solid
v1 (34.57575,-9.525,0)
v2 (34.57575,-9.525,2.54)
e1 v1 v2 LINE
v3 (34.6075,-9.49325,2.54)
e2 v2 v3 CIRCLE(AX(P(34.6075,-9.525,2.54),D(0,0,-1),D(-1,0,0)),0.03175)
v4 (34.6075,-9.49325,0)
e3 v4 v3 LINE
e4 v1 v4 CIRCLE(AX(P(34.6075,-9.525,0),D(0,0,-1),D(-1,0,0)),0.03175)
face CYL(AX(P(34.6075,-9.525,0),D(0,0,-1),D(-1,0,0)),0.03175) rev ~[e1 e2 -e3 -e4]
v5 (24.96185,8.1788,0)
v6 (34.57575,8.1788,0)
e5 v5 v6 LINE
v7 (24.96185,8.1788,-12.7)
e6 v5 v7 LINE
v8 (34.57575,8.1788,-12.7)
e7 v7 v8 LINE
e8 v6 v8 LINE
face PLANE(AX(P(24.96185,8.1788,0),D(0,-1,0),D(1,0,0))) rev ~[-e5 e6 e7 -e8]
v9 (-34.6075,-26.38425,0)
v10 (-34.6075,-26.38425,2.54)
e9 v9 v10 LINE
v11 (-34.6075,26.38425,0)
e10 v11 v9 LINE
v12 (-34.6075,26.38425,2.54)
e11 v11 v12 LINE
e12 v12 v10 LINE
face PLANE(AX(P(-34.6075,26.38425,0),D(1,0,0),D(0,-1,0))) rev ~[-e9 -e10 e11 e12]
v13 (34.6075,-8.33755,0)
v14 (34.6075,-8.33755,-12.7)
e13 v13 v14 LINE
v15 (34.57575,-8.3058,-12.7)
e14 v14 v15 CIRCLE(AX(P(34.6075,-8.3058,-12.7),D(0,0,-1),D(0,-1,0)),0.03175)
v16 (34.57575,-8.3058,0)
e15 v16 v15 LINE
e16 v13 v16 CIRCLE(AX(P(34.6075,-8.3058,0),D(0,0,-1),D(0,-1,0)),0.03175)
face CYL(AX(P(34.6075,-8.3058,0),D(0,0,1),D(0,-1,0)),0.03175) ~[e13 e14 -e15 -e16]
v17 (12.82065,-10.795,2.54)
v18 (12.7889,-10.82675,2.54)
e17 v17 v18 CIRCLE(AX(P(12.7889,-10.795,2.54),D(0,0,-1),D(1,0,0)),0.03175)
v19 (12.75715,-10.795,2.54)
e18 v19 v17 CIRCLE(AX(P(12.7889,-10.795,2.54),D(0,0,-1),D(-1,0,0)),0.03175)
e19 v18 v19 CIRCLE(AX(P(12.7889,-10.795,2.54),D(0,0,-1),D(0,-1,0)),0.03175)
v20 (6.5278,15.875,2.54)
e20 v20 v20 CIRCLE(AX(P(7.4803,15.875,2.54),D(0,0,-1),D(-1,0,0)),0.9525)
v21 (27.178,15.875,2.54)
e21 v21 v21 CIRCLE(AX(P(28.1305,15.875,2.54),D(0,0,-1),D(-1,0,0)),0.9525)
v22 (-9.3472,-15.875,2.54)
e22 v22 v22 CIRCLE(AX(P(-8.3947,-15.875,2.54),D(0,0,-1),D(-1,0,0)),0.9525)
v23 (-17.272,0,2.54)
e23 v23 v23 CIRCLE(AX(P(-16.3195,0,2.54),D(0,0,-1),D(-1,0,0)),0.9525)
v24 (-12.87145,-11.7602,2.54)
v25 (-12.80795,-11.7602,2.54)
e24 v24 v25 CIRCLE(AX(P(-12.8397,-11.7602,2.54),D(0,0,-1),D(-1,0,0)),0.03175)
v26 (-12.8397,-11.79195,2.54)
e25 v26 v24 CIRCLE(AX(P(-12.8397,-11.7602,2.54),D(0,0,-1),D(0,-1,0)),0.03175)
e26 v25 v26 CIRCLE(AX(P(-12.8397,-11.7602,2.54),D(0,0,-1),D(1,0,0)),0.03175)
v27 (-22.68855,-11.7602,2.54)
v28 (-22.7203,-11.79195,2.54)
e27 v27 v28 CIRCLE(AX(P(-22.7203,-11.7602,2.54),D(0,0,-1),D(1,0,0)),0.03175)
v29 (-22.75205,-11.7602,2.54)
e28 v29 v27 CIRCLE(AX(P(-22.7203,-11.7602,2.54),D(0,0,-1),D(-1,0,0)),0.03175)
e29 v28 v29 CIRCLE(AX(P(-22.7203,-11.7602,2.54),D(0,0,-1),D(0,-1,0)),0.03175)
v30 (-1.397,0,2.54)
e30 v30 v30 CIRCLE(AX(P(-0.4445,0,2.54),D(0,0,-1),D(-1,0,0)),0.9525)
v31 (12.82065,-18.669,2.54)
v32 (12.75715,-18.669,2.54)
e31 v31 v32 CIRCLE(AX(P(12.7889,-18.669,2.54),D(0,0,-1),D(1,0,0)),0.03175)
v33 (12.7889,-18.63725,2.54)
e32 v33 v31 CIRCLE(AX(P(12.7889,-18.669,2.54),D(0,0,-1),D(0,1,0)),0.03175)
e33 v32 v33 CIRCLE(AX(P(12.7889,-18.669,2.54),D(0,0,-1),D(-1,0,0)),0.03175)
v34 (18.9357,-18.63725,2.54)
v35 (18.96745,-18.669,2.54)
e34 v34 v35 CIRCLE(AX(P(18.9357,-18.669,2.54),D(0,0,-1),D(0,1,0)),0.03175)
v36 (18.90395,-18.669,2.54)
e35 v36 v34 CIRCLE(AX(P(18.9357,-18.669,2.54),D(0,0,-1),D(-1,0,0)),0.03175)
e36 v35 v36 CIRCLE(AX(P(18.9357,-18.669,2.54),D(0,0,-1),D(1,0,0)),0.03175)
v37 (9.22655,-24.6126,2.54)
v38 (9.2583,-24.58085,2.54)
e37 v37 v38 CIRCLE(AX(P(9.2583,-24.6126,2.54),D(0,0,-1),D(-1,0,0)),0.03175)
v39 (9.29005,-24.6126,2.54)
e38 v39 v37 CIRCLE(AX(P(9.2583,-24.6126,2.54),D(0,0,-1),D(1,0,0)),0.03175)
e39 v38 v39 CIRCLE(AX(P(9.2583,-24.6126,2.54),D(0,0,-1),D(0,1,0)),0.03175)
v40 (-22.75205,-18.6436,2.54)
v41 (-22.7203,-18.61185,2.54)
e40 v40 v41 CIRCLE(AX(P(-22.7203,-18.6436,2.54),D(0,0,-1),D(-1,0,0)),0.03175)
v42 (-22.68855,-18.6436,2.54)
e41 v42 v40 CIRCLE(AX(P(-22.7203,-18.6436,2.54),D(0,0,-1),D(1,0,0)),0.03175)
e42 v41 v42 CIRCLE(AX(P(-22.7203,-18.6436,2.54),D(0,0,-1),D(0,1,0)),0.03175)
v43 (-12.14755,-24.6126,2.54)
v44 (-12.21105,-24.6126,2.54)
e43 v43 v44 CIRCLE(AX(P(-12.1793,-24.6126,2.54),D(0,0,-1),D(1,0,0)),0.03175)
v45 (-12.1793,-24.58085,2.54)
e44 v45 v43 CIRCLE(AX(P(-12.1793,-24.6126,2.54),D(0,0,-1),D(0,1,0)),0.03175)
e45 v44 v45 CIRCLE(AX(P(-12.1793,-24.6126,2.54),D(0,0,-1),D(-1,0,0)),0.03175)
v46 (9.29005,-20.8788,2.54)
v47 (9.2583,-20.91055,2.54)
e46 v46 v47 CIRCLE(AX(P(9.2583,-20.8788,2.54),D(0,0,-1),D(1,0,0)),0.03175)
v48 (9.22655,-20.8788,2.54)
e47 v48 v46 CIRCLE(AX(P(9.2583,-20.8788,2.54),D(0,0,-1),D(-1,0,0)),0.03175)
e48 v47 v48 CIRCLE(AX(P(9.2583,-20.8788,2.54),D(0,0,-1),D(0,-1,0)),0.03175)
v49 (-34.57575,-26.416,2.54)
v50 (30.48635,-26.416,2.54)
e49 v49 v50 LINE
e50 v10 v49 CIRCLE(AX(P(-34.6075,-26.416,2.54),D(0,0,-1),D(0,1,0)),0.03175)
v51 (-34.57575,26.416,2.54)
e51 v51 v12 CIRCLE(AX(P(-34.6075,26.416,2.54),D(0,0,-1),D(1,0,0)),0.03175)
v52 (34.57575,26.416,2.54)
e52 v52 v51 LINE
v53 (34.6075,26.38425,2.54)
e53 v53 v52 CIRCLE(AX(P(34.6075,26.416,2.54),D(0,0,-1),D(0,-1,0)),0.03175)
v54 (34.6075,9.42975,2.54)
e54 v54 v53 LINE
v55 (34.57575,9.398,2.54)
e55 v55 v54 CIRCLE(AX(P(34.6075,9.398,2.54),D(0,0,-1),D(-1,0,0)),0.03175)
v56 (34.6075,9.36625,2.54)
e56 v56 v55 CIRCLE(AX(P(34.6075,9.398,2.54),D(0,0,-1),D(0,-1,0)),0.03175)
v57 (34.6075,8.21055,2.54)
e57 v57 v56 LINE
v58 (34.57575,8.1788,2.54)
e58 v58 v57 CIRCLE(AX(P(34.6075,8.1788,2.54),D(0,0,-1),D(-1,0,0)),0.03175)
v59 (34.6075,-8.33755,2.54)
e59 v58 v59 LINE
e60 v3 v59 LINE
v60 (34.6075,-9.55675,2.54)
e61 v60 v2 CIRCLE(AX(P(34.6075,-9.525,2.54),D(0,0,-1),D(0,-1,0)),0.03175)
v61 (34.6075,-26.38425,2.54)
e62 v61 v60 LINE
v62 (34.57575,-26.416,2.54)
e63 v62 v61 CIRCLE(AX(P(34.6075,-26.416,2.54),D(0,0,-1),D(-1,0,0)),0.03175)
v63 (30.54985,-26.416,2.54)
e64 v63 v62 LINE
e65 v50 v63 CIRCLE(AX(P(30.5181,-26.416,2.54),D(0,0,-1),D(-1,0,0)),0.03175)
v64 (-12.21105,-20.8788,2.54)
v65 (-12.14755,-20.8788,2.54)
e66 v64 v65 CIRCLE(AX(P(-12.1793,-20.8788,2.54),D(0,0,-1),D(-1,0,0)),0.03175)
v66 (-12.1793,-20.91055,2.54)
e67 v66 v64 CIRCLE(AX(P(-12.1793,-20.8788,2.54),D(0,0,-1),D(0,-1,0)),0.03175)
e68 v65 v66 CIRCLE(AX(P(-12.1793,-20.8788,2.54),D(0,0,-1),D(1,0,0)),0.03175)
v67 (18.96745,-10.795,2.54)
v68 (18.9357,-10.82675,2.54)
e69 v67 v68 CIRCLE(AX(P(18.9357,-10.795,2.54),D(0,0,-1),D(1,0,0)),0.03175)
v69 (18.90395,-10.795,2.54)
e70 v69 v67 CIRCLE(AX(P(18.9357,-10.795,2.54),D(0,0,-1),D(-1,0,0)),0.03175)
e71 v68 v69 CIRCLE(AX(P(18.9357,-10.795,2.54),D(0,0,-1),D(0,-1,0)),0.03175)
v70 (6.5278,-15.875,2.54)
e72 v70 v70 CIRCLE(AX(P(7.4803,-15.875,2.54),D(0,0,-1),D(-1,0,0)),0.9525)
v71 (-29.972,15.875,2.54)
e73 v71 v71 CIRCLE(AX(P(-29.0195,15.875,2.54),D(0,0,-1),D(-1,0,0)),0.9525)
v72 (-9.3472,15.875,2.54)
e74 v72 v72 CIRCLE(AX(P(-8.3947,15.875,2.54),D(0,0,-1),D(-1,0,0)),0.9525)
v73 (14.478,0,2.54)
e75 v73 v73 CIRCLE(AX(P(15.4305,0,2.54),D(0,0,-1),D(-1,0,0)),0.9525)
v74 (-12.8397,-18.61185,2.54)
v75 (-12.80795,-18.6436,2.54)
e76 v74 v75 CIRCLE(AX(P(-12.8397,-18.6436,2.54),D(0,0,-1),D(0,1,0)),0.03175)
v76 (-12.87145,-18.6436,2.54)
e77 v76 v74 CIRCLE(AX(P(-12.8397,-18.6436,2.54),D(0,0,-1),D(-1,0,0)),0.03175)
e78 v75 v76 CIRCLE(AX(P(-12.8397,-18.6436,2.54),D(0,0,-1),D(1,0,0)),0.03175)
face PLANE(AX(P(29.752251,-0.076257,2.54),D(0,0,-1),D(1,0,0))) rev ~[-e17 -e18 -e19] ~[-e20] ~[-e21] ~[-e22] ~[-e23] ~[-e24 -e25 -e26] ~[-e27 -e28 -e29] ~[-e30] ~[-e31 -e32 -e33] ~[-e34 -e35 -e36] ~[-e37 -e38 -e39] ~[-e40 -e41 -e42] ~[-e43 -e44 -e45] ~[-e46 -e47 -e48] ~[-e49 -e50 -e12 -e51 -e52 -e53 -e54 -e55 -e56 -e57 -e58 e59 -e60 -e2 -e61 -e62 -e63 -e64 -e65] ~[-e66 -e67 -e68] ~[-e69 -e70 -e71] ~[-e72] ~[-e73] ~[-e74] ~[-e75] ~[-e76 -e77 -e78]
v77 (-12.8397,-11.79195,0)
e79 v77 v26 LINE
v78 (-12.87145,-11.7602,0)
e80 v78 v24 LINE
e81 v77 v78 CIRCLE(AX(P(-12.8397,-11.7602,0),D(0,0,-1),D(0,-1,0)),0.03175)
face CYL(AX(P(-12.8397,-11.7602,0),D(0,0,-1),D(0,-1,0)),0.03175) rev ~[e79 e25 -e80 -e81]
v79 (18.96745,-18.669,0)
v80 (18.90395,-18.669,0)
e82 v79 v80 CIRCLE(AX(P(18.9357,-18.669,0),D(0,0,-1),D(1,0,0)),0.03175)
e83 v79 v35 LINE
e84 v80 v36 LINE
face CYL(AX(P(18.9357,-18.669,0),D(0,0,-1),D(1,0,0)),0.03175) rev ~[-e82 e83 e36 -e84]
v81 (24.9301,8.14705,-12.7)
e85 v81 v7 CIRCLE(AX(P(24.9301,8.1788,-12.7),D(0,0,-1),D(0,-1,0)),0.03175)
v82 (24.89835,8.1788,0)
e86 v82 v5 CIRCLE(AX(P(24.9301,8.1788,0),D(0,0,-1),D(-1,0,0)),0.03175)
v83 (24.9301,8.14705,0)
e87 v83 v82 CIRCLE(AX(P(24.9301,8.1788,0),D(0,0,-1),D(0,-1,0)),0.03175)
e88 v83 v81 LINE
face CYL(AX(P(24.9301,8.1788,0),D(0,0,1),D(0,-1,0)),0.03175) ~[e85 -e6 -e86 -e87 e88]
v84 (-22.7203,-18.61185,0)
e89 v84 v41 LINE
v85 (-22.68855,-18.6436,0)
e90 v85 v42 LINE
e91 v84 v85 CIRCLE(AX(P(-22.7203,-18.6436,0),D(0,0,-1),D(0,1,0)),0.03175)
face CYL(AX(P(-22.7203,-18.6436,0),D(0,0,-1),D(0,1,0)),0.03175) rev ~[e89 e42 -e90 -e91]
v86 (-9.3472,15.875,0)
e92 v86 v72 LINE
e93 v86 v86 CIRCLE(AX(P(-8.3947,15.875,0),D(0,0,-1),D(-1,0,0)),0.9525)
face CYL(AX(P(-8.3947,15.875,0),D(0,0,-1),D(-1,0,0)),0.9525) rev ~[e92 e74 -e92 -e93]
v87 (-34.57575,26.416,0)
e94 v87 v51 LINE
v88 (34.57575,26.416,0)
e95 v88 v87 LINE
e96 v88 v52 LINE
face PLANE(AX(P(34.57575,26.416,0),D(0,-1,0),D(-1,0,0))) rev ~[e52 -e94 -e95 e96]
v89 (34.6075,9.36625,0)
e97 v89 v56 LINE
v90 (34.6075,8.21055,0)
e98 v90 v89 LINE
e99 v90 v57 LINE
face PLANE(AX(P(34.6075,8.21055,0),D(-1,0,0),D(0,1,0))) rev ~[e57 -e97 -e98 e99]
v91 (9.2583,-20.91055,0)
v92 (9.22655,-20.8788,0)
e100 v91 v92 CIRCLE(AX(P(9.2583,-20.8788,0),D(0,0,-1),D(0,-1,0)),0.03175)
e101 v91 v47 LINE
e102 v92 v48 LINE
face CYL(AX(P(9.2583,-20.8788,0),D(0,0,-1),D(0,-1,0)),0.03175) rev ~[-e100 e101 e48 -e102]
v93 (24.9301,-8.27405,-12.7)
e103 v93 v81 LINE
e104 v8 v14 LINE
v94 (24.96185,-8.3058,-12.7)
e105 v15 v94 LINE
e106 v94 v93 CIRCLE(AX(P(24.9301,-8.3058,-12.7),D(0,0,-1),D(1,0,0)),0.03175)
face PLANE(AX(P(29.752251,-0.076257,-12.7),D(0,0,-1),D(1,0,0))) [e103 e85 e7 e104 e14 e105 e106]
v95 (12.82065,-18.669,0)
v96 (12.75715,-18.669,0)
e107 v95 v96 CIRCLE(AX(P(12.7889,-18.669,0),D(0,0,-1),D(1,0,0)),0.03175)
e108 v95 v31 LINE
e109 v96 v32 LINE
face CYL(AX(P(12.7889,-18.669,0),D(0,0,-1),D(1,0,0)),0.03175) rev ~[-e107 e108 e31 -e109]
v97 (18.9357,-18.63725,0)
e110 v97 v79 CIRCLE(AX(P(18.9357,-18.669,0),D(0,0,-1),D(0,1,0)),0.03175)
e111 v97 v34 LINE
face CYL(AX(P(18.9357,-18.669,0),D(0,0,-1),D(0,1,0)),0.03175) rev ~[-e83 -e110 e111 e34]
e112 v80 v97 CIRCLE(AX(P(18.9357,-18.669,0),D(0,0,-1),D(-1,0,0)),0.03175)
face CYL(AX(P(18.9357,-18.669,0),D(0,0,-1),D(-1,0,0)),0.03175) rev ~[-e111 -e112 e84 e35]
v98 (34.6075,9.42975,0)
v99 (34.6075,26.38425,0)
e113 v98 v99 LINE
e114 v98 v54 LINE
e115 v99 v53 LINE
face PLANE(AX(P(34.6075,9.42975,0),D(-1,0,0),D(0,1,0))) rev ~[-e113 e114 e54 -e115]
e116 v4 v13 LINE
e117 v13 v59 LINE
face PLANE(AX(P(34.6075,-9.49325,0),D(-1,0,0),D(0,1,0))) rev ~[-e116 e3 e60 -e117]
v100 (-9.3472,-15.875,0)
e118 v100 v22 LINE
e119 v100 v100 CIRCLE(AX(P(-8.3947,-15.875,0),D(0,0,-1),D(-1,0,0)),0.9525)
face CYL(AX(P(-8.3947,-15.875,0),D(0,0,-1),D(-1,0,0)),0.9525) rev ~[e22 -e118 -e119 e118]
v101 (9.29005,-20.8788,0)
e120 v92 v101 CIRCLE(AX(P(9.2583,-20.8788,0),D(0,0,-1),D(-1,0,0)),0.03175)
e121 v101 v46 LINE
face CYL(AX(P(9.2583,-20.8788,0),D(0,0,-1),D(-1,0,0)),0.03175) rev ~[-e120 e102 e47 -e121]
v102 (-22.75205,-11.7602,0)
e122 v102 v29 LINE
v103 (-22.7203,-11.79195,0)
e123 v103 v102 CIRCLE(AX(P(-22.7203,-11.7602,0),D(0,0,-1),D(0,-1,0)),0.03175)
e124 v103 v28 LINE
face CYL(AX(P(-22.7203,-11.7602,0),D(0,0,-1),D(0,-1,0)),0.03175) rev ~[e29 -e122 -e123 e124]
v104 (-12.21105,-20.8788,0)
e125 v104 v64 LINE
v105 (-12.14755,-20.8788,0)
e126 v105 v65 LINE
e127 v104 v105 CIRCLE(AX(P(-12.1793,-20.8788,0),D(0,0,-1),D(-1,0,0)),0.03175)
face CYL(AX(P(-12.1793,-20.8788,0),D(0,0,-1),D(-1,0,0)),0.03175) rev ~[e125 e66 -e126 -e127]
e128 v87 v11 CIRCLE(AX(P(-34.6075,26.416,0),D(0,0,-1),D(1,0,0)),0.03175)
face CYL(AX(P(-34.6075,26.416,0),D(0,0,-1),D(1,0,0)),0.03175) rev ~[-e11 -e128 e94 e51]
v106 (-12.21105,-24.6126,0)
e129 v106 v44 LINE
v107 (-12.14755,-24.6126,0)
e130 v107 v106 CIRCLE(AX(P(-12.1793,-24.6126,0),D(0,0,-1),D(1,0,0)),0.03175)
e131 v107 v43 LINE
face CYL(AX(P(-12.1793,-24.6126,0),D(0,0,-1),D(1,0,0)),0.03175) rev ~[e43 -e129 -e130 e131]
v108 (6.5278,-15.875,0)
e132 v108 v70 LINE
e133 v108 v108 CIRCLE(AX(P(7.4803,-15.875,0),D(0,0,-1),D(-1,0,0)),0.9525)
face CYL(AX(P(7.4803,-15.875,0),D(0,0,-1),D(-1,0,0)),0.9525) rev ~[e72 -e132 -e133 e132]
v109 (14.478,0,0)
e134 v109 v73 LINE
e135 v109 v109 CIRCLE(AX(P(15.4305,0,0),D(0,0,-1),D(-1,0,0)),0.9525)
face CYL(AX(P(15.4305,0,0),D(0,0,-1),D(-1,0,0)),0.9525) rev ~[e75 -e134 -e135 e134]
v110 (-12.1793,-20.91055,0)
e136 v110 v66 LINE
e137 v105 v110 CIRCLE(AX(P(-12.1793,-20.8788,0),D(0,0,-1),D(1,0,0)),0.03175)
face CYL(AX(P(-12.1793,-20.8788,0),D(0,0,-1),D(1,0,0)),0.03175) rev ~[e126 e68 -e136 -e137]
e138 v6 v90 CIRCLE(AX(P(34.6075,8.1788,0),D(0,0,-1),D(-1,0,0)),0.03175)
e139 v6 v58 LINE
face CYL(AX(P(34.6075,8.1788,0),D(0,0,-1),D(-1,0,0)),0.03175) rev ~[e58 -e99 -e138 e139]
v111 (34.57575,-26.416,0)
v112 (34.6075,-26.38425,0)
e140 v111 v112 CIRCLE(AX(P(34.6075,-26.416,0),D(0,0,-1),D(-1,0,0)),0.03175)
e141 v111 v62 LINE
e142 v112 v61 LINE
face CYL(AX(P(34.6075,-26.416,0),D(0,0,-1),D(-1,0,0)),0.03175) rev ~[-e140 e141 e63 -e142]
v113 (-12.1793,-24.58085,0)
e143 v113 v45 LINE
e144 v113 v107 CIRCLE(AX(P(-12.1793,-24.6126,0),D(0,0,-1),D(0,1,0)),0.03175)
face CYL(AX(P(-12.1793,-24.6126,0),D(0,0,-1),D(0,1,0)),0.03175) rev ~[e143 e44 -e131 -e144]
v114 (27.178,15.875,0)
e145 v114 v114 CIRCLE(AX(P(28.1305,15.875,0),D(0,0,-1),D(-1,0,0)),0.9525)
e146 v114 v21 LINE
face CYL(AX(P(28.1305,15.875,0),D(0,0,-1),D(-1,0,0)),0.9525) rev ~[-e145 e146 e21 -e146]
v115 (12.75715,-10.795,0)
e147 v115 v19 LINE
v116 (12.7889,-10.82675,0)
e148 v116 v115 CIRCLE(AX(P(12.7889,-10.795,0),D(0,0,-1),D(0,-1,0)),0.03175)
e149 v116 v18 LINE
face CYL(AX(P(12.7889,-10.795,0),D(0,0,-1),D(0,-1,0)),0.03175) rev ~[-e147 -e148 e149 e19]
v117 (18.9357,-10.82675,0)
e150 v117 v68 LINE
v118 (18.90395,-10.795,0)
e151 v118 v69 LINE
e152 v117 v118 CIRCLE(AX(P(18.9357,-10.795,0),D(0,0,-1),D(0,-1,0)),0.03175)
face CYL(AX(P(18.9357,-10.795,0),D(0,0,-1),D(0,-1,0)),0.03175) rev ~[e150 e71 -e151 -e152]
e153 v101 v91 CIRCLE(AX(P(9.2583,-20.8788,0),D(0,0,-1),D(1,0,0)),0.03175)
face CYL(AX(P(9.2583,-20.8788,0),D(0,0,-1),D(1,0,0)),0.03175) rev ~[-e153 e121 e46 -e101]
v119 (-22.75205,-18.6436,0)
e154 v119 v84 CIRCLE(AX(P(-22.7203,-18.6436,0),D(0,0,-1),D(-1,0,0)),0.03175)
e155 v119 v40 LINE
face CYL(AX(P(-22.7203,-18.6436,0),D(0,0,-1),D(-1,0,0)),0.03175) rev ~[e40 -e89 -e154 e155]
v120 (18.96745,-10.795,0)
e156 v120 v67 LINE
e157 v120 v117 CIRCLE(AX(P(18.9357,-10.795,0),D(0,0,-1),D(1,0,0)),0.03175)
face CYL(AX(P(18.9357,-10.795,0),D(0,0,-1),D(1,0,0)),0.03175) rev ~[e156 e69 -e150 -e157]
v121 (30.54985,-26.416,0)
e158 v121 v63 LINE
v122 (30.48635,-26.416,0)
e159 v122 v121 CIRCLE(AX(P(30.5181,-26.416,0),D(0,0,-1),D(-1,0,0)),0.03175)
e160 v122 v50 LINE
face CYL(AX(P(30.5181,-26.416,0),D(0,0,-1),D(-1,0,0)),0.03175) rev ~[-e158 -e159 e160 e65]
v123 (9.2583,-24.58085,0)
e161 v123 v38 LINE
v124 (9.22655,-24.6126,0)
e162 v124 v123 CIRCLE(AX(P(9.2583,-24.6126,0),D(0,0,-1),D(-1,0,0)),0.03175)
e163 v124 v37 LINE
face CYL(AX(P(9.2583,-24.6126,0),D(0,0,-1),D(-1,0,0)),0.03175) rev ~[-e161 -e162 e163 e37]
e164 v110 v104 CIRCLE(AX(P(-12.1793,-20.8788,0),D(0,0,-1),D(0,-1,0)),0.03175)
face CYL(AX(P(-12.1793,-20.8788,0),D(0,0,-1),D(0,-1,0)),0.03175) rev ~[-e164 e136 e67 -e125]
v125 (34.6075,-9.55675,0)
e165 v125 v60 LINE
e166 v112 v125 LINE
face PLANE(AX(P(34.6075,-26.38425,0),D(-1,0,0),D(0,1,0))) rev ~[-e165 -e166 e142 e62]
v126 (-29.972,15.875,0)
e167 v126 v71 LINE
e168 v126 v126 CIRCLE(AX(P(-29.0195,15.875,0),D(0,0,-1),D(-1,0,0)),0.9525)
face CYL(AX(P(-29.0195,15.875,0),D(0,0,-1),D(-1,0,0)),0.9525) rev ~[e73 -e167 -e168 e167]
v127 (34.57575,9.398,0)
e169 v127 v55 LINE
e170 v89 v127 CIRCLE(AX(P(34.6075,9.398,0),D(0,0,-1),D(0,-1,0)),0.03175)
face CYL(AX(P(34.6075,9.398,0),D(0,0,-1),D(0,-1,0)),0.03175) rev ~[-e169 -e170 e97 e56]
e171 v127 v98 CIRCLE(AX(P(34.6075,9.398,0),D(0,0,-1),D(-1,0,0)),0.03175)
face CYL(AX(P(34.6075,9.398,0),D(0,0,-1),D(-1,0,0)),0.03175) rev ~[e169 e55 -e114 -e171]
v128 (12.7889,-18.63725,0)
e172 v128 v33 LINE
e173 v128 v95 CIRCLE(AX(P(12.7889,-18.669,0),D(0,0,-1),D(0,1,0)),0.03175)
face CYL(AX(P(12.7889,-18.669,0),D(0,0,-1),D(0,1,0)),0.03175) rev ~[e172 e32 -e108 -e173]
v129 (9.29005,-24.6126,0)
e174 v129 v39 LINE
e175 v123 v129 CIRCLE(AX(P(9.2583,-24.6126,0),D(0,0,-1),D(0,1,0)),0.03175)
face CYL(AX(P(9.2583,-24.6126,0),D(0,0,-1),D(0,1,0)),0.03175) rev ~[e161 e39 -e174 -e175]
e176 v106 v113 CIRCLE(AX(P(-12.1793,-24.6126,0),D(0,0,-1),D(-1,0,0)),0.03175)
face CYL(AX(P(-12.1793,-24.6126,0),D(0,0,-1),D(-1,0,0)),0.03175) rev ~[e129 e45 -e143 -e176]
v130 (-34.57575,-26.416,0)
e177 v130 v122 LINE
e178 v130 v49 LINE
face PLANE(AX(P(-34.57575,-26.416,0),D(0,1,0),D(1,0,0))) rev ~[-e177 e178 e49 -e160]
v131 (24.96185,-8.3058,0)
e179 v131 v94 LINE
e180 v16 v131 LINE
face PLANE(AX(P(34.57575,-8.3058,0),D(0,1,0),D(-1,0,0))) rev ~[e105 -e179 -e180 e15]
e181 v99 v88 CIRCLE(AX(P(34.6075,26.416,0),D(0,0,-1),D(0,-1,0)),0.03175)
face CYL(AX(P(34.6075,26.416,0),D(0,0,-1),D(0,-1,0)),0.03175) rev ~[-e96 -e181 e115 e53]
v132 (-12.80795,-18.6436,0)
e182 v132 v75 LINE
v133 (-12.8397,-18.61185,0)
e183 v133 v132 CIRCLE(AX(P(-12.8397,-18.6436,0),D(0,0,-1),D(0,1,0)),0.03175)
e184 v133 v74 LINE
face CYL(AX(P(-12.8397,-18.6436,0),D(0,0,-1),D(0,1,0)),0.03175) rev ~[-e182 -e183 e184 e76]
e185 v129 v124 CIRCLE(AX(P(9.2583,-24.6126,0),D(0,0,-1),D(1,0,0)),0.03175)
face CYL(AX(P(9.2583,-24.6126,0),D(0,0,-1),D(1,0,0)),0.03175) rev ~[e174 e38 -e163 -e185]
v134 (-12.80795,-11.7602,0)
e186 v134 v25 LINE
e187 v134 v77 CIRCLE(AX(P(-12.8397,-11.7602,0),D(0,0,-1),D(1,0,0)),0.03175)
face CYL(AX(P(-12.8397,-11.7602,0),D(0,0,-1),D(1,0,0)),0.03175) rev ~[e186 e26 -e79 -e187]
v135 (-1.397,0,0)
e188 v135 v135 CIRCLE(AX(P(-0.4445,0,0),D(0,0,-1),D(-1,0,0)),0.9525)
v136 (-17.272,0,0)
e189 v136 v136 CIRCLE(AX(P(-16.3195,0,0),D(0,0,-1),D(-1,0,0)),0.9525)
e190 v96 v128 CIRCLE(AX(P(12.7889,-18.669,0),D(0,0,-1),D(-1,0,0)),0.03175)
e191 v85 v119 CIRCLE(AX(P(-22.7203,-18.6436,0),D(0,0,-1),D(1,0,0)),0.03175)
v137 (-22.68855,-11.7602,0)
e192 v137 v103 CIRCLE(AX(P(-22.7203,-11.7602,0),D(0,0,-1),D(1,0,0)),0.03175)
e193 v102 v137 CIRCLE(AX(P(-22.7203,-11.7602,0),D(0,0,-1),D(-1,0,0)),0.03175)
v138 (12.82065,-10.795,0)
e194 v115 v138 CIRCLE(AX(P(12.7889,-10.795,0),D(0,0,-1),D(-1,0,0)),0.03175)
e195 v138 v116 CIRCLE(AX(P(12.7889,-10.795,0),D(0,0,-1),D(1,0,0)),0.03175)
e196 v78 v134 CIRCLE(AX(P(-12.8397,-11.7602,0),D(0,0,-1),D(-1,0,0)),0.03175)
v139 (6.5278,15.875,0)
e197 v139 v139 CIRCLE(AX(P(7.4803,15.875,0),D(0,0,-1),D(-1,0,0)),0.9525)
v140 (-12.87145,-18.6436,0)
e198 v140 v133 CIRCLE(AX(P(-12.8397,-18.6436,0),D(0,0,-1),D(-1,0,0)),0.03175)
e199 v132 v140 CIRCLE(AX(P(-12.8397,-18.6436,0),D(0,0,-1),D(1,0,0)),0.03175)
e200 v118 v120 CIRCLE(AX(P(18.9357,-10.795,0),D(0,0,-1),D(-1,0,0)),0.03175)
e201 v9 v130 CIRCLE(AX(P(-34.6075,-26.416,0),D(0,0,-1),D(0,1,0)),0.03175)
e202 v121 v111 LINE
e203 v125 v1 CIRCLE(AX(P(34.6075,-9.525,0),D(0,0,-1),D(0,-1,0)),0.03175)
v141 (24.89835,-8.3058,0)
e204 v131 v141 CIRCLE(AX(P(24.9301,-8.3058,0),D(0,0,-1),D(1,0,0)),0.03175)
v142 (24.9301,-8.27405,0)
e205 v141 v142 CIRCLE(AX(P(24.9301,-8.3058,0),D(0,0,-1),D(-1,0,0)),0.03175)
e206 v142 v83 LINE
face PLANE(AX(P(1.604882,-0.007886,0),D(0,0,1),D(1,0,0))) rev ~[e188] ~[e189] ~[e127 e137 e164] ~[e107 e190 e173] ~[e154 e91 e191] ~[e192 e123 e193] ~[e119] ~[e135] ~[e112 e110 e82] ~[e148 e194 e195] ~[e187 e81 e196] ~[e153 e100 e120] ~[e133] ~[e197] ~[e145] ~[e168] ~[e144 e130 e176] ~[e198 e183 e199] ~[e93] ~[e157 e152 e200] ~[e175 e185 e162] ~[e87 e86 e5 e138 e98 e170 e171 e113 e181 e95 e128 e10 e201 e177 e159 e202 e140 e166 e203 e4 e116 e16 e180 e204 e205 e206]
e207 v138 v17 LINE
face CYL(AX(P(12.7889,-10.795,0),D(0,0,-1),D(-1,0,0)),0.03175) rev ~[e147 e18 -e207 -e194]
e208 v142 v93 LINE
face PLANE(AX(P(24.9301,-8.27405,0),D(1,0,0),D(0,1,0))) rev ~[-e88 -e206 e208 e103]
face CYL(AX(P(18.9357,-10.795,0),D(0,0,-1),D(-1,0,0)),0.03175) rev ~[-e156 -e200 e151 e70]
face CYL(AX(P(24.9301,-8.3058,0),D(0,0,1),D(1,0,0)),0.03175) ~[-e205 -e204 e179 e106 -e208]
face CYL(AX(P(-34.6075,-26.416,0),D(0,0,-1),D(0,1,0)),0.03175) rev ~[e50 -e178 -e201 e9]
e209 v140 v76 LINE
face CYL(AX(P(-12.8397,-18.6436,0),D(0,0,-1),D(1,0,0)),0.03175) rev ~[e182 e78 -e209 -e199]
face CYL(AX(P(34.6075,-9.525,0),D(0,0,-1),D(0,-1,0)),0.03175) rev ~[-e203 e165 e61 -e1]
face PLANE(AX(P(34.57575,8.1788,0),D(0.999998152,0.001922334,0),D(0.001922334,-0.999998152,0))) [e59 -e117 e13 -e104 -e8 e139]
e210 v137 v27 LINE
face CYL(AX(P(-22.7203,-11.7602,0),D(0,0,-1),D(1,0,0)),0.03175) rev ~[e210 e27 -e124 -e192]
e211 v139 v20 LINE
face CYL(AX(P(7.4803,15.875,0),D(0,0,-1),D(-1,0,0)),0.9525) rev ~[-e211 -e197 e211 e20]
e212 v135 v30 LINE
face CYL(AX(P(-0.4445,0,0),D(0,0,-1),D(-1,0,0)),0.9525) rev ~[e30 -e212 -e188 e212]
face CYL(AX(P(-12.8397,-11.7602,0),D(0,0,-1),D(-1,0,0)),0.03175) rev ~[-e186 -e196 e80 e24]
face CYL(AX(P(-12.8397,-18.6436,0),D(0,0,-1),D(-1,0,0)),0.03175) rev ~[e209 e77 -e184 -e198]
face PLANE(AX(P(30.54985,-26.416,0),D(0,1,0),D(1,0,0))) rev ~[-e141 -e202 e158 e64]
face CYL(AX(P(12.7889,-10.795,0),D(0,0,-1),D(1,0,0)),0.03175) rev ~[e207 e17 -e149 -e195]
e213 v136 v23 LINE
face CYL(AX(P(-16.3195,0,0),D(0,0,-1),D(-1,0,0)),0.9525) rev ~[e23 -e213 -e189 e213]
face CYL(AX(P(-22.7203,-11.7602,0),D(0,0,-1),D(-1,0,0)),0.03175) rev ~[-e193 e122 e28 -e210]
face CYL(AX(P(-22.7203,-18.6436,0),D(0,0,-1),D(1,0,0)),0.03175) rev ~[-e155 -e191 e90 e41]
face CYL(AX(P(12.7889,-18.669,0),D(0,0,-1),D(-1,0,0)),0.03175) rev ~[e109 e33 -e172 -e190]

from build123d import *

# Parameters (mm, degrees)
F1_DEPTH = 2.54
F3_DEPTH = 12.7
F4_DEPTH = 2.54


# Not quite as in the source:
# - a feature names something its author has since deleted; it is built from what else it names


with BuildPart() as f1:
    # F0 (on Top) → F1 (new body)
    with BuildSketch(Plane.XY):
        with BuildLine():
            ThreePointArc((24.89835, -8.3058), (24.9076493597, -8.2833493597), (24.9301, -8.27405))
            Line((24.9301, -8.27405), (24.9301, 8.14705))
            ThreePointArc((24.9301, 8.14705), (24.9076493597, 8.1563493597), (24.89835, 8.1788))
            ThreePointArc((24.89835, 8.1788), (24.9301, 8.21055), (24.96185, 8.1788))
            Line((24.96185, 8.1788), (34.57575, 8.1788))
            ThreePointArc((34.57575, 8.1788), (34.5850493597, 8.2012506403), (34.6075, 8.21055))
            Line((34.6075, 8.21055), (34.6075, 9.36625))
            ThreePointArc((34.6075, 9.36625), (34.5850493597, 9.3755493597), (34.57575, 9.398))
            ThreePointArc((34.57575, 9.398), (34.5850493597, 9.4204506403), (34.6075, 9.42975))
            Line((34.6075, 9.42975), (34.6075, 26.38425))
            ThreePointArc((34.6075, 26.38425), (34.5850493597, 26.3935493597), (34.57575, 26.416))
            Line((34.57575, 26.416), (-34.57575, 26.416))
            ThreePointArc((-34.57575, 26.416), (-34.5850493597, 26.3935493597), (-34.6075, 26.38425))
            Line((-34.6075, 26.38425), (-34.6075, -26.38425))
            ThreePointArc((-34.6075, -26.38425), (-34.5850493597, -26.3935493597), (-34.57575, -26.416))
            Line((-34.57575, -26.416), (30.48635, -26.416))
            ThreePointArc((30.48635, -26.416), (30.5181, -26.38425), (30.54985, -26.416))
            Line((30.54985, -26.416), (34.57575, -26.416))
            ThreePointArc((34.57575, -26.416), (34.5850493597, -26.3935493597), (34.6075, -26.38425))
            Line((34.6075, -26.38425), (34.6075, -9.55675))
            ThreePointArc((34.6075, -9.55675), (34.5850493597, -9.5474506403), (34.57575, -9.525))
            ThreePointArc((34.57575, -9.525), (34.5850493597, -9.5025493597), (34.6075, -9.49325))
            Line((34.6075, -9.49325), (34.6075, -8.33755))
            ThreePointArc((34.6075, -8.33755), (34.5850493597, -8.3282506403), (34.57575, -8.3058))
            Line((34.57575, -8.3058), (24.96185, -8.3058))
            ThreePointArc((24.96185, -8.3058), (24.9301, -8.33755), (24.89835, -8.3058))
        make_face()
        with BuildLine():
            Line((-12.8397, -11.79195), (-12.8397, -18.61185))
            ThreePointArc((-12.8397, -18.61185), (-12.8172493597, -18.6211493597), (-12.80795, -18.6436))
            ThreePointArc((-12.80795, -18.6436), (-12.8397, -18.67535), (-12.87145, -18.6436))
            Line((-12.87145, -18.6436), (-22.68855, -18.6436))
            ThreePointArc((-22.68855, -18.6436), (-22.7203, -18.67535), (-22.75205, -18.6436))
            ThreePointArc((-22.75205, -18.6436), (-22.7427506403, -18.6211493597), (-22.7203, -18.61185))
            Line((-22.7203, -18.61185), (-22.7203, -11.79195))
            ThreePointArc((-22.7203, -11.79195), (-22.7427506403, -11.7826506403), (-22.75205, -11.7602))
            ThreePointArc((-22.75205, -11.7602), (-22.7203, -11.72845), (-22.68855, -11.7602))
            Line((-22.68855, -11.7602), (-12.87145, -11.7602))
            ThreePointArc((-12.87145, -11.7602), (-12.8397, -11.72845), (-12.80795, -11.7602))
            ThreePointArc((-12.80795, -11.7602), (-12.8172493597, -11.7826506403), (-12.8397, -11.79195))
        make_face(mode=Mode.SUBTRACT)
        with BuildLine():
            ThreePointArc((-12.21105, -24.6126), (-12.2017506403, -24.5901493597), (-12.1793, -24.58085))
            Line((-12.1793, -24.58085), (-12.1793, -20.91055))
            ThreePointArc((-12.1793, -20.91055), (-12.2017506403, -20.9012506403), (-12.21105, -20.8788))
            ThreePointArc((-12.21105, -20.8788), (-12.1793, -20.84705), (-12.14755, -20.8788))
            Line((-12.14755, -20.8788), (9.22655, -20.8788))
            ThreePointArc((9.22655, -20.8788), (9.2583, -20.84705), (9.29005, -20.8788))
            ThreePointArc((9.29005, -20.8788), (9.2807506403, -20.9012506403), (9.2583, -20.91055))
            Line((9.2583, -20.91055), (9.2583, -24.58085))
            ThreePointArc((9.2583, -24.58085), (9.2807506403, -24.5901493597), (9.29005, -24.6126))
            ThreePointArc((9.29005, -24.6126), (9.2583, -24.64435), (9.22655, -24.6126))
            Line((9.22655, -24.6126), (-12.14755, -24.6126))
            ThreePointArc((-12.14755, -24.6126), (-12.1793, -24.64435), (-12.21105, -24.6126))
        make_face(mode=Mode.SUBTRACT)
        with BuildLine():
            ThreePointArc((-7.4422, -15.875), (-8.3947, -16.8275), (-9.3472, -15.875))
            ThreePointArc((-9.3472, -15.875), (-8.3947, -14.9225), (-7.4422, -15.875))
        make_face(mode=Mode.SUBTRACT)
        with BuildLine():
            ThreePointArc((8.4328, -15.875), (7.4803, -16.8275), (6.5278, -15.875))
            ThreePointArc((6.5278, -15.875), (7.4803, -14.9225), (8.4328, -15.875))
        make_face(mode=Mode.SUBTRACT)
        with BuildLine():
            ThreePointArc((12.75715, -18.669), (12.7664493597, -18.6465493597), (12.7889, -18.63725))
            Line((12.7889, -18.63725), (12.7889, -10.82675))
            ThreePointArc((12.7889, -10.82675), (12.7664493597, -10.8174506403), (12.75715, -10.795))
            ThreePointArc((12.75715, -10.795), (12.7889, -10.76325), (12.82065, -10.795))
            Line((12.82065, -10.795), (18.90395, -10.795))
            ThreePointArc((18.90395, -10.795), (18.9357, -10.76325), (18.96745, -10.795))
            ThreePointArc((18.96745, -10.795), (18.9581506403, -10.8174506403), (18.9357, -10.82675))
            Line((18.9357, -10.82675), (18.9357, -18.63725))
            ThreePointArc((18.9357, -18.63725), (18.9581506403, -18.6465493597), (18.96745, -18.669))
            ThreePointArc((18.96745, -18.669), (18.9357, -18.70075), (18.90395, -18.669))
            Line((18.90395, -18.669), (12.82065, -18.669))
            ThreePointArc((12.82065, -18.669), (12.7889, -18.70075), (12.75715, -18.669))
        make_face(mode=Mode.SUBTRACT)
        with BuildLine():
            ThreePointArc((-15.367, 0), (-16.3195, -0.9525), (-17.272, 0))
            ThreePointArc((-17.272, 0), (-16.3195, 0.9525), (-15.367, 0))
        make_face(mode=Mode.SUBTRACT)
        with BuildLine():
            ThreePointArc((0.508, 0), (-0.4445, -0.9525), (-1.397, 0))
            ThreePointArc((-1.397, 0), (-0.4445, 0.9525), (0.508, 0))
        make_face(mode=Mode.SUBTRACT)
        with BuildLine():
            ThreePointArc((-28.067, 15.875), (-29.0195, 14.9225), (-29.972, 15.875))
            ThreePointArc((-29.972, 15.875), (-29.0195, 16.8275), (-28.067, 15.875))
        make_face(mode=Mode.SUBTRACT)
        with BuildLine():
            ThreePointArc((-7.4422, 15.875), (-8.3947, 14.9225), (-9.3472, 15.875))
            ThreePointArc((-9.3472, 15.875), (-8.3947, 16.8275), (-7.4422, 15.875))
        make_face(mode=Mode.SUBTRACT)
        with BuildLine():
            ThreePointArc((16.383, 0), (15.4305, -0.9525), (14.478, 0))
            ThreePointArc((14.478, 0), (15.4305, 0.9525), (16.383, 0))
        make_face(mode=Mode.SUBTRACT)
        with BuildLine():
            ThreePointArc((8.4328, 15.875), (7.4803, 14.9225), (6.5278, 15.875))
            ThreePointArc((6.5278, 15.875), (7.4803, 16.8275), (8.4328, 15.875))
        make_face(mode=Mode.SUBTRACT)
        with BuildLine():
            ThreePointArc((29.083, 15.875), (28.1305, 14.9225), (27.178, 15.875))
            ThreePointArc((27.178, 15.875), (28.1305, 16.8275), (29.083, 15.875))
        make_face(mode=Mode.SUBTRACT)
        with BuildLine():
            Line((12.7889, -10.82675), (12.7889, -18.63725))
            ThreePointArc((12.7889, -18.63725), (12.8113506403, -18.6465493597), (12.82065, -18.669))
            Line((12.82065, -18.669), (18.90395, -18.669))
            ThreePointArc((18.90395, -18.669), (18.9132493597, -18.6465493597), (18.9357, -18.63725))
            Line((18.9357, -18.63725), (18.9357, -10.82675))
            ThreePointArc((18.9357, -10.82675), (18.9132493597, -10.8174506403), (18.90395, -10.795))
            Line((18.90395, -10.795), (12.82065, -10.795))
            ThreePointArc((12.82065, -10.795), (12.8113506403, -10.8174506403), (12.7889, -10.82675))
        make_face()
        with BuildLine():
            Line((-12.1793, -20.91055), (-12.1793, -24.58085))
            ThreePointArc((-12.1793, -24.58085), (-12.1568493597, -24.5901493597), (-12.14755, -24.6126))
            Line((-12.14755, -24.6126), (9.22655, -24.6126))
            ThreePointArc((9.22655, -24.6126), (9.2358493597, -24.5901493597), (9.2583, -24.58085))
            Line((9.2583, -24.58085), (9.2583, -20.91055))
            ThreePointArc((9.2583, -20.91055), (9.2358493597, -20.9012506403), (9.22655, -20.8788))
            Line((9.22655, -20.8788), (-12.14755, -20.8788))
            ThreePointArc((-12.14755, -20.8788), (-12.1568493597, -20.9012506403), (-12.1793, -20.91055))
        make_face()
        with BuildLine():
            ThreePointArc((-12.87145, -18.6436), (-12.8621506403, -18.6211493597), (-12.8397, -18.61185))
            Line((-12.8397, -18.61185), (-12.8397, -11.79195))
            ThreePointArc((-12.8397, -11.79195), (-12.8621506403, -11.7826506403), (-12.87145, -11.7602))
            Line((-12.87145, -11.7602), (-22.68855, -11.7602))
            ThreePointArc((-22.68855, -11.7602), (-22.6978493597, -11.7826506403), (-22.7203, -11.79195))
            Line((-22.7203, -11.79195), (-22.7203, -18.61185))
            ThreePointArc((-22.7203, -18.61185), (-22.6978493597, -18.6211493597), (-22.68855, -18.6436))
            Line((-22.68855, -18.6436), (-12.87145, -18.6436))
        make_face()
    extrude(amount=F1_DEPTH)

    # F2 (on face) → F3 (join)
    with BuildSketch(Plane(origin=(0, 0, 0), x_dir=(1, 0, 0), z_dir=(0, 0, -1))):
        with BuildLine():
            Line((24.96185, -8.1788), (34.57575, -8.1788))
            Line((34.57575, -8.1788), (34.6075, 8.33755))
            ThreePointArc((34.6075, 8.33755), (34.5850493597, 8.3282506403), (34.57575, 8.3058))
            Line((34.57575, 8.3058), (24.96185, 8.3058))
            ThreePointArc((24.96185, 8.3058), (24.9076493597, 8.3282506403), (24.9301, 8.27405))
            Line((24.9301, 8.27405), (24.9301, -8.14705))
            ThreePointArc((24.9301, -8.14705), (24.9076493597, -8.2012506403), (24.96185, -8.1788))
        make_face()
    extrude(amount=F3_DEPTH)

    # F4 (add): a face of the model
    f4_faces = [f1.faces().sort_by_distance(p)[0] for p in [
        (29.7607313536, -0.0680465181, 0),
    ]]
    extrude(f4_faces, amount=F4_DEPTH)


solid = f1.part
